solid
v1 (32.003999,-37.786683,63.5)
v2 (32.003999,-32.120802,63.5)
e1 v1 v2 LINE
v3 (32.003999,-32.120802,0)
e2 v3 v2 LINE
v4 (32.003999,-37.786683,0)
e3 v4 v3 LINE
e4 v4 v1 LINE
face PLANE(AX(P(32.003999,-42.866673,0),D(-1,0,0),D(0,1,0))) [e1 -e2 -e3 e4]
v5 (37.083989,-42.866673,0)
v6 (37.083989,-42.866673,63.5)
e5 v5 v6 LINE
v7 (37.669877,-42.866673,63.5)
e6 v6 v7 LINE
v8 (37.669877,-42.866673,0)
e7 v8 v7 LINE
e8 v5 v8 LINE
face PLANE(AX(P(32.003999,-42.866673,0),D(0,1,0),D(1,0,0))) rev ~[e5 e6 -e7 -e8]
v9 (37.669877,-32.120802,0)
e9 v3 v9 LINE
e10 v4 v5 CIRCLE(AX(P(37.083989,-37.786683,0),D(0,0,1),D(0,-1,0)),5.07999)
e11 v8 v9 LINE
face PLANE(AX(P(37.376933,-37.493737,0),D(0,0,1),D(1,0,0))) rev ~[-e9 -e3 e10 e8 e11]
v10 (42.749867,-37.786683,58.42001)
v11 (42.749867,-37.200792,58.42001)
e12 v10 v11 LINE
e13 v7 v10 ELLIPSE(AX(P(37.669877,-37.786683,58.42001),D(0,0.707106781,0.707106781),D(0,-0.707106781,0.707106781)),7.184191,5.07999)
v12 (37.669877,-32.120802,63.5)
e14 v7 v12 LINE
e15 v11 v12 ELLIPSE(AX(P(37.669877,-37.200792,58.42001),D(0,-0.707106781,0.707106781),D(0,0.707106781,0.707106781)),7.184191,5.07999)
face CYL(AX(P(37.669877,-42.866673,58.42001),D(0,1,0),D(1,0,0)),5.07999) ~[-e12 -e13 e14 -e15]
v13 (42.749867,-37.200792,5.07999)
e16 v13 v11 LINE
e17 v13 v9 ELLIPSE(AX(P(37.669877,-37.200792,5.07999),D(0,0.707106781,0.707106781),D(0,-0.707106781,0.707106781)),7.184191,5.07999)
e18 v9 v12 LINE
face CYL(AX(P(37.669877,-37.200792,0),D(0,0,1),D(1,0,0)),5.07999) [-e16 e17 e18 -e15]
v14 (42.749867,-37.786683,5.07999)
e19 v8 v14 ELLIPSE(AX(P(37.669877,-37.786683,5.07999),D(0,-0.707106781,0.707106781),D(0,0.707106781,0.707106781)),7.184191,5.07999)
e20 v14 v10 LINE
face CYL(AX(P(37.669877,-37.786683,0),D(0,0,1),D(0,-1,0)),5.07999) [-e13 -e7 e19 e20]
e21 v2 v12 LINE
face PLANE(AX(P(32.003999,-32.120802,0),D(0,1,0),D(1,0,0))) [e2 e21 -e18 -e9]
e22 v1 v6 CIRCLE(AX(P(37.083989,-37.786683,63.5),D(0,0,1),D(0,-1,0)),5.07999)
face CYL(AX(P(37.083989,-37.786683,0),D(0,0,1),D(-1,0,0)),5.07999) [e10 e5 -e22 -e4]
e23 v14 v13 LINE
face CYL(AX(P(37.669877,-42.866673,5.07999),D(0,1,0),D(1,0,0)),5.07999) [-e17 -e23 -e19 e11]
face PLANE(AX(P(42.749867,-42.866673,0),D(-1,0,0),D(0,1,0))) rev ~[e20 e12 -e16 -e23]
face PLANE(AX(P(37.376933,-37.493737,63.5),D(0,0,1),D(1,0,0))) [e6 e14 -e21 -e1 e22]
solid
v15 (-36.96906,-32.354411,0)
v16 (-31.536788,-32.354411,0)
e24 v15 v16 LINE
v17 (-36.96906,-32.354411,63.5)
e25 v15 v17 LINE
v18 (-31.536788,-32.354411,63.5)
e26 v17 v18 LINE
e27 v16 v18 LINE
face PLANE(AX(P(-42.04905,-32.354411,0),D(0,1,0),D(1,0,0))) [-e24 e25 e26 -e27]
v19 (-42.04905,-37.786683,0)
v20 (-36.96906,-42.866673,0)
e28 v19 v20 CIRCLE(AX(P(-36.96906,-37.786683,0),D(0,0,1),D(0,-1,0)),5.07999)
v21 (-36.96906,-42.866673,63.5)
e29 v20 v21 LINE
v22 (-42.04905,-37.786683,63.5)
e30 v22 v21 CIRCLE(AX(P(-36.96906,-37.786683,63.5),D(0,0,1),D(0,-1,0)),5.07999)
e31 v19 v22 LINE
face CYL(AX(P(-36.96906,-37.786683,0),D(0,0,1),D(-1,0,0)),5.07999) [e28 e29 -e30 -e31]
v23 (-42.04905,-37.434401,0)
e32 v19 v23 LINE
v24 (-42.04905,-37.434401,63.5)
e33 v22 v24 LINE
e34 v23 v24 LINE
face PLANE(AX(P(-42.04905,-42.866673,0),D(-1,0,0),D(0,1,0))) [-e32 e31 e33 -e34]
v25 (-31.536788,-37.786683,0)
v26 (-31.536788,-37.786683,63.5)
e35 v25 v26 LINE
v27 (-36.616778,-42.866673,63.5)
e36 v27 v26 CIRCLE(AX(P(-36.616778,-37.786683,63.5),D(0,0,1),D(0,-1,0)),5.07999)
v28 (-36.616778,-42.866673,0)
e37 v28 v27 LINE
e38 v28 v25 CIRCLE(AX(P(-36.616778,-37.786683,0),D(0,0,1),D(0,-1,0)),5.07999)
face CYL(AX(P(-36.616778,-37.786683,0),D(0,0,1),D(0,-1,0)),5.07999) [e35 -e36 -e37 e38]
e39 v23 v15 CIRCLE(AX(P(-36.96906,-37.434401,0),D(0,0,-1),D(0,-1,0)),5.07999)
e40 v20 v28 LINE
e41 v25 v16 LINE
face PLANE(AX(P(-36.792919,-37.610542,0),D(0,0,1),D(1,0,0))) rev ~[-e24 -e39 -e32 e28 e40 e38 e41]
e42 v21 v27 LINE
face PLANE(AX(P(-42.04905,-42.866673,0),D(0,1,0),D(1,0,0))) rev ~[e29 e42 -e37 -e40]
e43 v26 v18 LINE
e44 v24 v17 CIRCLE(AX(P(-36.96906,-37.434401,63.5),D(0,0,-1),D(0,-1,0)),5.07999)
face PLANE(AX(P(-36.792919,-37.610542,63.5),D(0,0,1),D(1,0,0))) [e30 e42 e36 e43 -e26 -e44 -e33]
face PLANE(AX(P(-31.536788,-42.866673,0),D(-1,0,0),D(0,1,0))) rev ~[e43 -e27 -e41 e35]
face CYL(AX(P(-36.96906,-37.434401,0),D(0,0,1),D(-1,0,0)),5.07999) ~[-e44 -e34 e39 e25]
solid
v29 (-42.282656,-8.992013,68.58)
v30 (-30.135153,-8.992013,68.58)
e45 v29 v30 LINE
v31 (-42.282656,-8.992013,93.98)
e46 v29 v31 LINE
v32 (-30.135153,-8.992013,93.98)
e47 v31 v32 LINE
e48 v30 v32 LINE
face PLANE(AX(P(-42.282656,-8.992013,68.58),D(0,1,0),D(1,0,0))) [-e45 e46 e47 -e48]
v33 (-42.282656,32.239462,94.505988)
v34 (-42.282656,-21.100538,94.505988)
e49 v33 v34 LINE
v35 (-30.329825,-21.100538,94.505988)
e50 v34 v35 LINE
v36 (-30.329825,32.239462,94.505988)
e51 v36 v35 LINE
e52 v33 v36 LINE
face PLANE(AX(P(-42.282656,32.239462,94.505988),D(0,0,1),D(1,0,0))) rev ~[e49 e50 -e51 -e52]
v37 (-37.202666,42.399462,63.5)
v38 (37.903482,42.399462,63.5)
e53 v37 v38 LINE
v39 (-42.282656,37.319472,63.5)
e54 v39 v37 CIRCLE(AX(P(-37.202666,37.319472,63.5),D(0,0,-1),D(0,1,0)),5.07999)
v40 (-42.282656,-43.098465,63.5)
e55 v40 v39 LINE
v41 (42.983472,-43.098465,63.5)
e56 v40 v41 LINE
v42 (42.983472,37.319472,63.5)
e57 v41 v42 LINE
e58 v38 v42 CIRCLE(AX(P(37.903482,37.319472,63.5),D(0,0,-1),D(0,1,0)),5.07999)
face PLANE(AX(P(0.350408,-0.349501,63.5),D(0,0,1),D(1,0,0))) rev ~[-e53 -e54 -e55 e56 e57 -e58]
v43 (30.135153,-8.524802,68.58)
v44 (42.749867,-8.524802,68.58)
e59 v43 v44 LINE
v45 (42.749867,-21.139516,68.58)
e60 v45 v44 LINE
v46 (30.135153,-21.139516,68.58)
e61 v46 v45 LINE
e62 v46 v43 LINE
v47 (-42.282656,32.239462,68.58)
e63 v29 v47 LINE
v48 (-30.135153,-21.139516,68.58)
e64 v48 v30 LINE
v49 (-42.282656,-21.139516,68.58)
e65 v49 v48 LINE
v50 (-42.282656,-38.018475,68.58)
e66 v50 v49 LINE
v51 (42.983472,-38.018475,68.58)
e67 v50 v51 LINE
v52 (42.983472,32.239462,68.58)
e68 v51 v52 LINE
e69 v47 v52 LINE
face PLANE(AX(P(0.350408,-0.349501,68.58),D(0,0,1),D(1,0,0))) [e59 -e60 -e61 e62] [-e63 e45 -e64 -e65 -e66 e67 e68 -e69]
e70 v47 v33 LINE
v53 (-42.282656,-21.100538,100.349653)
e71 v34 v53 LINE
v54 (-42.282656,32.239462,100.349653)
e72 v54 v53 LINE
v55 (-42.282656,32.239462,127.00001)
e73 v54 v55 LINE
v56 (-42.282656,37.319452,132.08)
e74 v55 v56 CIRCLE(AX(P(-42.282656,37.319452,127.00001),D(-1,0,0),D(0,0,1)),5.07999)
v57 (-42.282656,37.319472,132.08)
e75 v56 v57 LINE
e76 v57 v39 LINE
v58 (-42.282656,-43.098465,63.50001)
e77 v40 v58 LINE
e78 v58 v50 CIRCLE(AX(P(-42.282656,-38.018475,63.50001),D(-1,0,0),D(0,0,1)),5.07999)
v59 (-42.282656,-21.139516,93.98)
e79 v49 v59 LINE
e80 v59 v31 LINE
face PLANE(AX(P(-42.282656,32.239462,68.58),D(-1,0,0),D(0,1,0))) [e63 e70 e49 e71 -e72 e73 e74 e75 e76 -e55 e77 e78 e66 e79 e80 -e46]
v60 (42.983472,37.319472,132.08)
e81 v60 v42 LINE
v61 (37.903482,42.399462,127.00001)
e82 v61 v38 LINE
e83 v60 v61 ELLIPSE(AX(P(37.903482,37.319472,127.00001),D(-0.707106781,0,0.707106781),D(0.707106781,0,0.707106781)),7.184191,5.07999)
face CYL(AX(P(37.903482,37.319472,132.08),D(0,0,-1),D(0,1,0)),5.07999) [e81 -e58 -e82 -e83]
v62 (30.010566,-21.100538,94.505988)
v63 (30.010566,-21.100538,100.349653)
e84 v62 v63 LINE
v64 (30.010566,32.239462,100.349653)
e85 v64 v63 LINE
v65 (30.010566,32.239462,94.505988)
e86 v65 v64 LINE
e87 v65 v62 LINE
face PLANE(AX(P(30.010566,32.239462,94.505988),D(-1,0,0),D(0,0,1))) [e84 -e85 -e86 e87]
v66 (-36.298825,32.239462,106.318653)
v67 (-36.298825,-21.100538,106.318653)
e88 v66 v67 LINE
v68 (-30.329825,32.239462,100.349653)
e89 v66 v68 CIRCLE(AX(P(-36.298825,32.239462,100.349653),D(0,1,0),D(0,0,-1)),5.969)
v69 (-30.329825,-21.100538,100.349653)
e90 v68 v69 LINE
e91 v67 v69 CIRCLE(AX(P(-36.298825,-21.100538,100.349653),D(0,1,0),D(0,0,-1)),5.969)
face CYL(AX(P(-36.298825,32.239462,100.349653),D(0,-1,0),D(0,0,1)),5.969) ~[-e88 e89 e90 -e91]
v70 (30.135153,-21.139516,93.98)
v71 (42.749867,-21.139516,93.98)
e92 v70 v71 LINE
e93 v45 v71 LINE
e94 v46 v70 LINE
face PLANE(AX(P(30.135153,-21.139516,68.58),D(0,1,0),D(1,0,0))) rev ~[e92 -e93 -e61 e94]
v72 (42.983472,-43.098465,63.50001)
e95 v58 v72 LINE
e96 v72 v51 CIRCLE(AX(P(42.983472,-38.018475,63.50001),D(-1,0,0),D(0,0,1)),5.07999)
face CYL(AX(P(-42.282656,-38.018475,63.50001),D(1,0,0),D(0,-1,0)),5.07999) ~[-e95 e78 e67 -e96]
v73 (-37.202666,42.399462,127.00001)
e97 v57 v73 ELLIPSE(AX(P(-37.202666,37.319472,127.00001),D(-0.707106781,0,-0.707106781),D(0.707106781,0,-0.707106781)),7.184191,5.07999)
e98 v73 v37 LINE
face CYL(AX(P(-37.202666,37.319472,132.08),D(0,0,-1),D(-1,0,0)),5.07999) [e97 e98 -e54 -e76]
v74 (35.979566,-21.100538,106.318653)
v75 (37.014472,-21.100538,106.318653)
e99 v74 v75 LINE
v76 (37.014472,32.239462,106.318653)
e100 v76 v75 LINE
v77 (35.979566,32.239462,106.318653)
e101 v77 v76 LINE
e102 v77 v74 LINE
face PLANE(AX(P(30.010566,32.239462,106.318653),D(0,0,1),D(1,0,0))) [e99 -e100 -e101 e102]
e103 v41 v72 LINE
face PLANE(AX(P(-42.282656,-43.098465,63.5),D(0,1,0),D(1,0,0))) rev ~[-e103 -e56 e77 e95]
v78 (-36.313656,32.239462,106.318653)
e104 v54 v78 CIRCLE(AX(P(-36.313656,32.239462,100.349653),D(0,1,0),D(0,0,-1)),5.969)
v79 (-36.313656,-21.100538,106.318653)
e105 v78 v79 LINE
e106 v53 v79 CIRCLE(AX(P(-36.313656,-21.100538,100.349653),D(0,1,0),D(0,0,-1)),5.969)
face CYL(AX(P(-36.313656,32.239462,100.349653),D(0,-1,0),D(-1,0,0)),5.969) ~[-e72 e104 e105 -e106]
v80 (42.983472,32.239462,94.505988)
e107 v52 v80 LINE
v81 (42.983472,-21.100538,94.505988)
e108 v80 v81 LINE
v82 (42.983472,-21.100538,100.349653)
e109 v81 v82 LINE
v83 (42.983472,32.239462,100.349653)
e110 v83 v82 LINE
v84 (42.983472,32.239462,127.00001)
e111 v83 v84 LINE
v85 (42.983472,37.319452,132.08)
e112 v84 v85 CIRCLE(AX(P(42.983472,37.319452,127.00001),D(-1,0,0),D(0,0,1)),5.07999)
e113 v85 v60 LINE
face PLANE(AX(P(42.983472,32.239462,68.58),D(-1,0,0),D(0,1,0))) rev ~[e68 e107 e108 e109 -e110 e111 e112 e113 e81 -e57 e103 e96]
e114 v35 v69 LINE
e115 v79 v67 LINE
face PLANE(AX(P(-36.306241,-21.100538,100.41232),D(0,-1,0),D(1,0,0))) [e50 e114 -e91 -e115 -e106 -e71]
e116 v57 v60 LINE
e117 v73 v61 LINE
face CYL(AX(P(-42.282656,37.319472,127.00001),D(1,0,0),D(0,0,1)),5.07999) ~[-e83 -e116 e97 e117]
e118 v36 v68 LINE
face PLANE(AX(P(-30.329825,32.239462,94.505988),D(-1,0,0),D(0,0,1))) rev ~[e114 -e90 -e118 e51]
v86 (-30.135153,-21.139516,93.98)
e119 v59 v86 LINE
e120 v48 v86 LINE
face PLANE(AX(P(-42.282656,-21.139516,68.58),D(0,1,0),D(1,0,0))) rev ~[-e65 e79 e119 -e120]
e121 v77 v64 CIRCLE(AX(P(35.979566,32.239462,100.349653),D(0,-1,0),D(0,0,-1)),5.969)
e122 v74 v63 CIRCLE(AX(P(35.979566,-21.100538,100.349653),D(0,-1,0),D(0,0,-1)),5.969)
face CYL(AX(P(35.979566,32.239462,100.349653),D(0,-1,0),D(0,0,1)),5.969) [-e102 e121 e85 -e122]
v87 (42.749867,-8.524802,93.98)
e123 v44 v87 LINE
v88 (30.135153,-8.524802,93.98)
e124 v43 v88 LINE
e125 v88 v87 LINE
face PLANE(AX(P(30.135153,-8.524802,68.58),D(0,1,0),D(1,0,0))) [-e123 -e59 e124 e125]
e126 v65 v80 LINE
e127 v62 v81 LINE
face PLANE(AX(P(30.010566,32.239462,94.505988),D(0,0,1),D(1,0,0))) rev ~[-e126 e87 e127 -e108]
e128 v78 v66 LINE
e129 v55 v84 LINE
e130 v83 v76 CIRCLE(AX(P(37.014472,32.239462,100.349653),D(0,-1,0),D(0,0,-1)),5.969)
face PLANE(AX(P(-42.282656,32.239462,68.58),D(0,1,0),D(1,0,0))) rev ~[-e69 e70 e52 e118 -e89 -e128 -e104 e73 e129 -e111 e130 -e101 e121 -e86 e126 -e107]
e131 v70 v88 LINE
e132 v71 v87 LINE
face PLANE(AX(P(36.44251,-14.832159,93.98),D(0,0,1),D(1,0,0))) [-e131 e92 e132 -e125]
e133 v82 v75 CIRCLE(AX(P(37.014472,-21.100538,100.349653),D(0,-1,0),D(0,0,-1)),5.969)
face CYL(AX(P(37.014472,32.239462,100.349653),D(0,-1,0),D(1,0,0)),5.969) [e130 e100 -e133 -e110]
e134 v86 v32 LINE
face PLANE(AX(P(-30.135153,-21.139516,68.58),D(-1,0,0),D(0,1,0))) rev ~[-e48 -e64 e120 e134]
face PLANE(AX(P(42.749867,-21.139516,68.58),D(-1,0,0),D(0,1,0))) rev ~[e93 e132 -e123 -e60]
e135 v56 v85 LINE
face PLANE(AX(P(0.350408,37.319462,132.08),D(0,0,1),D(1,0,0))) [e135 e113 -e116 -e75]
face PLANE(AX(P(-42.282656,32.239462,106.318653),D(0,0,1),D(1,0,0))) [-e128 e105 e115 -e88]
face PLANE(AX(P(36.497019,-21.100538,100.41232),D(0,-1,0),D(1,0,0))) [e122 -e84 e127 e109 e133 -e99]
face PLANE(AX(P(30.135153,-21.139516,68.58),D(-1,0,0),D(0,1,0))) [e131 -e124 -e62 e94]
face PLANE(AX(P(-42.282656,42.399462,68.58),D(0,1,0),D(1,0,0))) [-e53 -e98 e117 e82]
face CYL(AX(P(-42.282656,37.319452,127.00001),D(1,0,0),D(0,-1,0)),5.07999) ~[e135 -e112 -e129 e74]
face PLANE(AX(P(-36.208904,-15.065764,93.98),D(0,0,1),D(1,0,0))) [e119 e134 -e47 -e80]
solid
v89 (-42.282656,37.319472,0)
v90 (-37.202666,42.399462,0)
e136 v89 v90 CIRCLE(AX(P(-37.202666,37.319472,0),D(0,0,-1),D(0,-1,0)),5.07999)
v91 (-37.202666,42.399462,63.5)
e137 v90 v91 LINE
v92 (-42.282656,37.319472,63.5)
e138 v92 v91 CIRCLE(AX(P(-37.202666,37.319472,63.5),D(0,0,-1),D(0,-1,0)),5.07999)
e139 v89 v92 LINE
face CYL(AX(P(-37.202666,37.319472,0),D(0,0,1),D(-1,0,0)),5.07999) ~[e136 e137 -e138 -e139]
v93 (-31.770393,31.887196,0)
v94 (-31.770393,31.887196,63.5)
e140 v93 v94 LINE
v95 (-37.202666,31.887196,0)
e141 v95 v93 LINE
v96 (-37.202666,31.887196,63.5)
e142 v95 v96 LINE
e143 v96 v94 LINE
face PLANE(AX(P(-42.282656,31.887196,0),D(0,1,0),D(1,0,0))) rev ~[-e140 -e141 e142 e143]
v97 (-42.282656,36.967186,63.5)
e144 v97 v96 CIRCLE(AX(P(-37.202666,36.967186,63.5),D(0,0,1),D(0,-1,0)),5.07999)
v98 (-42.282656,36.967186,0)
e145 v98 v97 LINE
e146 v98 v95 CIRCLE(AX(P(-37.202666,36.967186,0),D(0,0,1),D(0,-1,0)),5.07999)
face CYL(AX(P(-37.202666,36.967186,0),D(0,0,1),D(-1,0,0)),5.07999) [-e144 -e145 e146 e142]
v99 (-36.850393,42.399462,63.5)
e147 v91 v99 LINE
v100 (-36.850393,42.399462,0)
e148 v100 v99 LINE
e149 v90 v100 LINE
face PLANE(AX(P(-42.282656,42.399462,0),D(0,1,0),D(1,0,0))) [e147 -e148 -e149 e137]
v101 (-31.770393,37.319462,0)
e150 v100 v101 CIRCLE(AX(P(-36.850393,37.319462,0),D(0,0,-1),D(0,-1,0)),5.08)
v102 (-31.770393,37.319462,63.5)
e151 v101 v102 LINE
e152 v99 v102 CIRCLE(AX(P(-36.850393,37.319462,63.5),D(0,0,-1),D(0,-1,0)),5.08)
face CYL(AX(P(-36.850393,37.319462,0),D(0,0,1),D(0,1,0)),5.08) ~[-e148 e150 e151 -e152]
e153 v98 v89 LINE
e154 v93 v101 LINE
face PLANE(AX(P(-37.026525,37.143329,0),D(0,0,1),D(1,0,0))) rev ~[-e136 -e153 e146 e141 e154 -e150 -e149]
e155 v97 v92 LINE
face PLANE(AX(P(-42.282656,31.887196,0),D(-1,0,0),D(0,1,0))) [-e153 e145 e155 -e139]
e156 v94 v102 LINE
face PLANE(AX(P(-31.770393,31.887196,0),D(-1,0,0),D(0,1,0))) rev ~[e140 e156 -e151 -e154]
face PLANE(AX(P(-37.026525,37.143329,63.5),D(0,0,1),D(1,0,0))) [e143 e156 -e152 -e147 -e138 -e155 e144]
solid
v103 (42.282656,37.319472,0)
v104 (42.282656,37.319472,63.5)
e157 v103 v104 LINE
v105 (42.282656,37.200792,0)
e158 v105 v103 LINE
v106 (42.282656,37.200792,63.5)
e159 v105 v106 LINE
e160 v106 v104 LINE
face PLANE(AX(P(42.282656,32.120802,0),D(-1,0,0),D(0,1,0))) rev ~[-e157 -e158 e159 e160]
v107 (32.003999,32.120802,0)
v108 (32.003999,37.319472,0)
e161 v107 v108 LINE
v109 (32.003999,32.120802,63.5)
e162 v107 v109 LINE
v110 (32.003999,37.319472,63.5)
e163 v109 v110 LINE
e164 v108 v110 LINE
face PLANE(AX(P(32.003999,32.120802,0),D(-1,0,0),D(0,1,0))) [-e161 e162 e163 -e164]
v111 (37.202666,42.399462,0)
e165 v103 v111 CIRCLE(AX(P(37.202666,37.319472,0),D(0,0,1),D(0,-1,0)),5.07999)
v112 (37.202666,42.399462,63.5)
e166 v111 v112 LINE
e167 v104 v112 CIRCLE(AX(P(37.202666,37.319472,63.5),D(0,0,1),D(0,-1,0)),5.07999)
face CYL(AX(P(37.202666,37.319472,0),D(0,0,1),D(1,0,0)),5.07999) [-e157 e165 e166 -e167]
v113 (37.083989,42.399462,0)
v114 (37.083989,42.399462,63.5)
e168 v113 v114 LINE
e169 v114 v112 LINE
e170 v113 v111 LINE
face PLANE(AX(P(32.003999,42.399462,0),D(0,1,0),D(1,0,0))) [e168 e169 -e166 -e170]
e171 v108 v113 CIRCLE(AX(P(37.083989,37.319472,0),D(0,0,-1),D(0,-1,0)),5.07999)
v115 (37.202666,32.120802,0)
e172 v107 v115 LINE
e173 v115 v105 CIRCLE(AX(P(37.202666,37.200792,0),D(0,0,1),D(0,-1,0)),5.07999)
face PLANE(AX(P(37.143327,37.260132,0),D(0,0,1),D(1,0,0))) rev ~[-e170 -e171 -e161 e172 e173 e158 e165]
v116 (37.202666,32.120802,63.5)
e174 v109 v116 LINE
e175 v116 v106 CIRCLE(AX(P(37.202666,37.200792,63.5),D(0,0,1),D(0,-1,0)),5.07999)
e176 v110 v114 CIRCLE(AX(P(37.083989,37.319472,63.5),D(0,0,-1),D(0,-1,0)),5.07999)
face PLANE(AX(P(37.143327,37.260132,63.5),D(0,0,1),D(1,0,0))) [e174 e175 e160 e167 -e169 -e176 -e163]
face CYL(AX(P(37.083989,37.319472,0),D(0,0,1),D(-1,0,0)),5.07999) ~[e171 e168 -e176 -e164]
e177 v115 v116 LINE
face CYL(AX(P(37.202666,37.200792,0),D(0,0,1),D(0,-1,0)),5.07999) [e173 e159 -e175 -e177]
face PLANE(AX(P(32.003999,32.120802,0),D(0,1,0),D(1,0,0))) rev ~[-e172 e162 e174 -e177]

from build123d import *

# Parameters (mm, degrees)
F0_W      = 10.5122625828
F0_H      = 10.5122663081
F0_W_2    = 10.2786570787
F0_H_2    = 10.278660804
F0_H_3    = 10.5122625828
F0_W_3    = 10.7458680868
F0_H_4    = 10.7458718121
F1_DEPTH  = 63.5
F2_W      = 85.2661281824
F2_H      = 85.4979269207
F3_DEPTH  = 5.08
F4_W      = 85.2661281824
F4_H      = 10.16
F5_DEPTH  = 63.5
F7_W      = 12.1475029737
F7_H      = 12.1475029737
F7_W_2    = 12.6147139817
F7_H_2    = 12.6147139817
F8_DEPTH  = 25.4
F9_W      = 11.9528304785
F9_H      = 11.8126645684
F9_W_2    = 12.9729062319
F10_DEPTH = 53.34
F11_R     = 5.07999
F11_2_R   = 5.07999
F12_R     = 5.08
F13_R     = 5.969


# Not quite as in the source:
# - a fillet or chamfer is up to 0.001 mm smaller than in the source, because OpenCascade refuses the exact size


with BuildPart() as f1:
    # F0 (on Top) → F1 (new body)
    with BuildSketch(Plane.XY):
        with Locations((-37.0265245438, 37.1433291584)):
            Rectangle(F0_W, F0_H)
        with Locations((37.1433272958, 37.2601319104)):
            Rectangle(F0_W_2, F0_H_2)
        with Locations((-36.7929190397, -37.6105420291)):
            Rectangle(F0_W, F0_H_3)
        with Locations((37.3769327998, -37.4937374145)):
            Rectangle(F0_W_3, F0_H_4)
    extrude(amount=F1_DEPTH)

    # F11#2 (radius 5.08 in the source; OpenCascade refuses exactly that, so slightly less here)
    f11_2_edges = [f1.edges().sort_by_distance(p)[0] for p in [
        (-42.282656, 42.399462, 31.75),
        (-42.282656, 31.887196, 31.75),
        (-42.04905, -42.866673, 31.75),
        (-42.04905, -32.354411, 31.75),
        (-31.536788, -42.866673, 31.75),
        (32.003999, -42.866673, 31.75),
        (42.749867, -42.866673, 31.75),
        (42.749867, -32.120802, 31.75),
        (42.749867, -37.493737, 0),
        (42.749867, -37.493737, 63.5),
        (42.282656, 42.399462, 31.75),
        (42.282656, 32.120802, 31.75),
        (32.003999, 42.399462, 31.75),
    ]]
    fillet(f11_2_edges, radius=F11_2_R)

    # F12
    f12_edges = [f1.edges().sort_by_distance(p)[0] for p in [
        (32.003999, 37.319472, 31.75),
        (-31.770393, 42.399462, 31.75),
        (-37.202666, 42.399462, 31.75),
        (-42.282656, 37.319472, 31.75),
    ]]
    fillet(f12_edges, radius=F12_R)


with BuildPart() as f3:
    # F2 (on face) → F3 (new body)
    with BuildSketch(Plane.XY.offset(63.5)):
        with Locations((0.3504082561, -0.3495011479)):
            Rectangle(F2_W, F2_H)
    extrude(amount=F3_DEPTH)

    # F4 (on face) → F5 (join)
    with BuildSketch(Plane.XY.offset(68.58)):
        with Locations((0.3504082561, 37.3194623125)):
            Rectangle(F4_W, F4_H)
    extrude(amount=F5_DEPTH)

    # F7 (on face) → F8 (join)
    with BuildSketch(Plane.XY.offset(68.58)):
        with Locations((-36.2089043483, -15.065764077)):
            Rectangle(F7_W, F7_H)
        with Locations((36.4425098523, -14.832158573)):
            Rectangle(F7_W_2, F7_H_2)
    extrude(amount=F8_DEPTH)

    # F9 (on face) → F10 (join)
    with BuildSketch(Plane.XZ.offset(-32.2394623125)):
        with Locations((-36.3062405959, 100.4123203456)):
            Rectangle(F9_W, F9_H)
        with Locations((36.4970192313, 100.4123203456)):
            Rectangle(F9_W_2, F9_H)
    extrude(amount=F10_DEPTH)

    # F11 (radius 5.08 in the source; OpenCascade refuses exactly that, so slightly less here)
    f11_edges = [f3.edges().sort_by_distance(p)[0] for p in [
        (0.350408, -43.098465, 68.58),
        (0.350408, 32.239462, 132.08),
        (0.350408, 42.399462, 132.08),
        (42.983472, 42.399462, 97.79),
        (-42.282656, 42.399462, 97.79),
    ]]
    fillet(f11_edges, radius=F11_R)

    # F13
    f13_edges = [f3.edges().sort_by_distance(p)[0] for p in [
        (-42.282656, 5.569462, 106.318653),
        (-30.329825, 5.569462, 106.318653),
        (30.010566, 5.569462, 106.318653),
        (42.983472, 5.569462, 106.318653),
    ]]
    fillet(f13_edges, radius=F13_R)


solid = Compound([f1.part, f3.part])
